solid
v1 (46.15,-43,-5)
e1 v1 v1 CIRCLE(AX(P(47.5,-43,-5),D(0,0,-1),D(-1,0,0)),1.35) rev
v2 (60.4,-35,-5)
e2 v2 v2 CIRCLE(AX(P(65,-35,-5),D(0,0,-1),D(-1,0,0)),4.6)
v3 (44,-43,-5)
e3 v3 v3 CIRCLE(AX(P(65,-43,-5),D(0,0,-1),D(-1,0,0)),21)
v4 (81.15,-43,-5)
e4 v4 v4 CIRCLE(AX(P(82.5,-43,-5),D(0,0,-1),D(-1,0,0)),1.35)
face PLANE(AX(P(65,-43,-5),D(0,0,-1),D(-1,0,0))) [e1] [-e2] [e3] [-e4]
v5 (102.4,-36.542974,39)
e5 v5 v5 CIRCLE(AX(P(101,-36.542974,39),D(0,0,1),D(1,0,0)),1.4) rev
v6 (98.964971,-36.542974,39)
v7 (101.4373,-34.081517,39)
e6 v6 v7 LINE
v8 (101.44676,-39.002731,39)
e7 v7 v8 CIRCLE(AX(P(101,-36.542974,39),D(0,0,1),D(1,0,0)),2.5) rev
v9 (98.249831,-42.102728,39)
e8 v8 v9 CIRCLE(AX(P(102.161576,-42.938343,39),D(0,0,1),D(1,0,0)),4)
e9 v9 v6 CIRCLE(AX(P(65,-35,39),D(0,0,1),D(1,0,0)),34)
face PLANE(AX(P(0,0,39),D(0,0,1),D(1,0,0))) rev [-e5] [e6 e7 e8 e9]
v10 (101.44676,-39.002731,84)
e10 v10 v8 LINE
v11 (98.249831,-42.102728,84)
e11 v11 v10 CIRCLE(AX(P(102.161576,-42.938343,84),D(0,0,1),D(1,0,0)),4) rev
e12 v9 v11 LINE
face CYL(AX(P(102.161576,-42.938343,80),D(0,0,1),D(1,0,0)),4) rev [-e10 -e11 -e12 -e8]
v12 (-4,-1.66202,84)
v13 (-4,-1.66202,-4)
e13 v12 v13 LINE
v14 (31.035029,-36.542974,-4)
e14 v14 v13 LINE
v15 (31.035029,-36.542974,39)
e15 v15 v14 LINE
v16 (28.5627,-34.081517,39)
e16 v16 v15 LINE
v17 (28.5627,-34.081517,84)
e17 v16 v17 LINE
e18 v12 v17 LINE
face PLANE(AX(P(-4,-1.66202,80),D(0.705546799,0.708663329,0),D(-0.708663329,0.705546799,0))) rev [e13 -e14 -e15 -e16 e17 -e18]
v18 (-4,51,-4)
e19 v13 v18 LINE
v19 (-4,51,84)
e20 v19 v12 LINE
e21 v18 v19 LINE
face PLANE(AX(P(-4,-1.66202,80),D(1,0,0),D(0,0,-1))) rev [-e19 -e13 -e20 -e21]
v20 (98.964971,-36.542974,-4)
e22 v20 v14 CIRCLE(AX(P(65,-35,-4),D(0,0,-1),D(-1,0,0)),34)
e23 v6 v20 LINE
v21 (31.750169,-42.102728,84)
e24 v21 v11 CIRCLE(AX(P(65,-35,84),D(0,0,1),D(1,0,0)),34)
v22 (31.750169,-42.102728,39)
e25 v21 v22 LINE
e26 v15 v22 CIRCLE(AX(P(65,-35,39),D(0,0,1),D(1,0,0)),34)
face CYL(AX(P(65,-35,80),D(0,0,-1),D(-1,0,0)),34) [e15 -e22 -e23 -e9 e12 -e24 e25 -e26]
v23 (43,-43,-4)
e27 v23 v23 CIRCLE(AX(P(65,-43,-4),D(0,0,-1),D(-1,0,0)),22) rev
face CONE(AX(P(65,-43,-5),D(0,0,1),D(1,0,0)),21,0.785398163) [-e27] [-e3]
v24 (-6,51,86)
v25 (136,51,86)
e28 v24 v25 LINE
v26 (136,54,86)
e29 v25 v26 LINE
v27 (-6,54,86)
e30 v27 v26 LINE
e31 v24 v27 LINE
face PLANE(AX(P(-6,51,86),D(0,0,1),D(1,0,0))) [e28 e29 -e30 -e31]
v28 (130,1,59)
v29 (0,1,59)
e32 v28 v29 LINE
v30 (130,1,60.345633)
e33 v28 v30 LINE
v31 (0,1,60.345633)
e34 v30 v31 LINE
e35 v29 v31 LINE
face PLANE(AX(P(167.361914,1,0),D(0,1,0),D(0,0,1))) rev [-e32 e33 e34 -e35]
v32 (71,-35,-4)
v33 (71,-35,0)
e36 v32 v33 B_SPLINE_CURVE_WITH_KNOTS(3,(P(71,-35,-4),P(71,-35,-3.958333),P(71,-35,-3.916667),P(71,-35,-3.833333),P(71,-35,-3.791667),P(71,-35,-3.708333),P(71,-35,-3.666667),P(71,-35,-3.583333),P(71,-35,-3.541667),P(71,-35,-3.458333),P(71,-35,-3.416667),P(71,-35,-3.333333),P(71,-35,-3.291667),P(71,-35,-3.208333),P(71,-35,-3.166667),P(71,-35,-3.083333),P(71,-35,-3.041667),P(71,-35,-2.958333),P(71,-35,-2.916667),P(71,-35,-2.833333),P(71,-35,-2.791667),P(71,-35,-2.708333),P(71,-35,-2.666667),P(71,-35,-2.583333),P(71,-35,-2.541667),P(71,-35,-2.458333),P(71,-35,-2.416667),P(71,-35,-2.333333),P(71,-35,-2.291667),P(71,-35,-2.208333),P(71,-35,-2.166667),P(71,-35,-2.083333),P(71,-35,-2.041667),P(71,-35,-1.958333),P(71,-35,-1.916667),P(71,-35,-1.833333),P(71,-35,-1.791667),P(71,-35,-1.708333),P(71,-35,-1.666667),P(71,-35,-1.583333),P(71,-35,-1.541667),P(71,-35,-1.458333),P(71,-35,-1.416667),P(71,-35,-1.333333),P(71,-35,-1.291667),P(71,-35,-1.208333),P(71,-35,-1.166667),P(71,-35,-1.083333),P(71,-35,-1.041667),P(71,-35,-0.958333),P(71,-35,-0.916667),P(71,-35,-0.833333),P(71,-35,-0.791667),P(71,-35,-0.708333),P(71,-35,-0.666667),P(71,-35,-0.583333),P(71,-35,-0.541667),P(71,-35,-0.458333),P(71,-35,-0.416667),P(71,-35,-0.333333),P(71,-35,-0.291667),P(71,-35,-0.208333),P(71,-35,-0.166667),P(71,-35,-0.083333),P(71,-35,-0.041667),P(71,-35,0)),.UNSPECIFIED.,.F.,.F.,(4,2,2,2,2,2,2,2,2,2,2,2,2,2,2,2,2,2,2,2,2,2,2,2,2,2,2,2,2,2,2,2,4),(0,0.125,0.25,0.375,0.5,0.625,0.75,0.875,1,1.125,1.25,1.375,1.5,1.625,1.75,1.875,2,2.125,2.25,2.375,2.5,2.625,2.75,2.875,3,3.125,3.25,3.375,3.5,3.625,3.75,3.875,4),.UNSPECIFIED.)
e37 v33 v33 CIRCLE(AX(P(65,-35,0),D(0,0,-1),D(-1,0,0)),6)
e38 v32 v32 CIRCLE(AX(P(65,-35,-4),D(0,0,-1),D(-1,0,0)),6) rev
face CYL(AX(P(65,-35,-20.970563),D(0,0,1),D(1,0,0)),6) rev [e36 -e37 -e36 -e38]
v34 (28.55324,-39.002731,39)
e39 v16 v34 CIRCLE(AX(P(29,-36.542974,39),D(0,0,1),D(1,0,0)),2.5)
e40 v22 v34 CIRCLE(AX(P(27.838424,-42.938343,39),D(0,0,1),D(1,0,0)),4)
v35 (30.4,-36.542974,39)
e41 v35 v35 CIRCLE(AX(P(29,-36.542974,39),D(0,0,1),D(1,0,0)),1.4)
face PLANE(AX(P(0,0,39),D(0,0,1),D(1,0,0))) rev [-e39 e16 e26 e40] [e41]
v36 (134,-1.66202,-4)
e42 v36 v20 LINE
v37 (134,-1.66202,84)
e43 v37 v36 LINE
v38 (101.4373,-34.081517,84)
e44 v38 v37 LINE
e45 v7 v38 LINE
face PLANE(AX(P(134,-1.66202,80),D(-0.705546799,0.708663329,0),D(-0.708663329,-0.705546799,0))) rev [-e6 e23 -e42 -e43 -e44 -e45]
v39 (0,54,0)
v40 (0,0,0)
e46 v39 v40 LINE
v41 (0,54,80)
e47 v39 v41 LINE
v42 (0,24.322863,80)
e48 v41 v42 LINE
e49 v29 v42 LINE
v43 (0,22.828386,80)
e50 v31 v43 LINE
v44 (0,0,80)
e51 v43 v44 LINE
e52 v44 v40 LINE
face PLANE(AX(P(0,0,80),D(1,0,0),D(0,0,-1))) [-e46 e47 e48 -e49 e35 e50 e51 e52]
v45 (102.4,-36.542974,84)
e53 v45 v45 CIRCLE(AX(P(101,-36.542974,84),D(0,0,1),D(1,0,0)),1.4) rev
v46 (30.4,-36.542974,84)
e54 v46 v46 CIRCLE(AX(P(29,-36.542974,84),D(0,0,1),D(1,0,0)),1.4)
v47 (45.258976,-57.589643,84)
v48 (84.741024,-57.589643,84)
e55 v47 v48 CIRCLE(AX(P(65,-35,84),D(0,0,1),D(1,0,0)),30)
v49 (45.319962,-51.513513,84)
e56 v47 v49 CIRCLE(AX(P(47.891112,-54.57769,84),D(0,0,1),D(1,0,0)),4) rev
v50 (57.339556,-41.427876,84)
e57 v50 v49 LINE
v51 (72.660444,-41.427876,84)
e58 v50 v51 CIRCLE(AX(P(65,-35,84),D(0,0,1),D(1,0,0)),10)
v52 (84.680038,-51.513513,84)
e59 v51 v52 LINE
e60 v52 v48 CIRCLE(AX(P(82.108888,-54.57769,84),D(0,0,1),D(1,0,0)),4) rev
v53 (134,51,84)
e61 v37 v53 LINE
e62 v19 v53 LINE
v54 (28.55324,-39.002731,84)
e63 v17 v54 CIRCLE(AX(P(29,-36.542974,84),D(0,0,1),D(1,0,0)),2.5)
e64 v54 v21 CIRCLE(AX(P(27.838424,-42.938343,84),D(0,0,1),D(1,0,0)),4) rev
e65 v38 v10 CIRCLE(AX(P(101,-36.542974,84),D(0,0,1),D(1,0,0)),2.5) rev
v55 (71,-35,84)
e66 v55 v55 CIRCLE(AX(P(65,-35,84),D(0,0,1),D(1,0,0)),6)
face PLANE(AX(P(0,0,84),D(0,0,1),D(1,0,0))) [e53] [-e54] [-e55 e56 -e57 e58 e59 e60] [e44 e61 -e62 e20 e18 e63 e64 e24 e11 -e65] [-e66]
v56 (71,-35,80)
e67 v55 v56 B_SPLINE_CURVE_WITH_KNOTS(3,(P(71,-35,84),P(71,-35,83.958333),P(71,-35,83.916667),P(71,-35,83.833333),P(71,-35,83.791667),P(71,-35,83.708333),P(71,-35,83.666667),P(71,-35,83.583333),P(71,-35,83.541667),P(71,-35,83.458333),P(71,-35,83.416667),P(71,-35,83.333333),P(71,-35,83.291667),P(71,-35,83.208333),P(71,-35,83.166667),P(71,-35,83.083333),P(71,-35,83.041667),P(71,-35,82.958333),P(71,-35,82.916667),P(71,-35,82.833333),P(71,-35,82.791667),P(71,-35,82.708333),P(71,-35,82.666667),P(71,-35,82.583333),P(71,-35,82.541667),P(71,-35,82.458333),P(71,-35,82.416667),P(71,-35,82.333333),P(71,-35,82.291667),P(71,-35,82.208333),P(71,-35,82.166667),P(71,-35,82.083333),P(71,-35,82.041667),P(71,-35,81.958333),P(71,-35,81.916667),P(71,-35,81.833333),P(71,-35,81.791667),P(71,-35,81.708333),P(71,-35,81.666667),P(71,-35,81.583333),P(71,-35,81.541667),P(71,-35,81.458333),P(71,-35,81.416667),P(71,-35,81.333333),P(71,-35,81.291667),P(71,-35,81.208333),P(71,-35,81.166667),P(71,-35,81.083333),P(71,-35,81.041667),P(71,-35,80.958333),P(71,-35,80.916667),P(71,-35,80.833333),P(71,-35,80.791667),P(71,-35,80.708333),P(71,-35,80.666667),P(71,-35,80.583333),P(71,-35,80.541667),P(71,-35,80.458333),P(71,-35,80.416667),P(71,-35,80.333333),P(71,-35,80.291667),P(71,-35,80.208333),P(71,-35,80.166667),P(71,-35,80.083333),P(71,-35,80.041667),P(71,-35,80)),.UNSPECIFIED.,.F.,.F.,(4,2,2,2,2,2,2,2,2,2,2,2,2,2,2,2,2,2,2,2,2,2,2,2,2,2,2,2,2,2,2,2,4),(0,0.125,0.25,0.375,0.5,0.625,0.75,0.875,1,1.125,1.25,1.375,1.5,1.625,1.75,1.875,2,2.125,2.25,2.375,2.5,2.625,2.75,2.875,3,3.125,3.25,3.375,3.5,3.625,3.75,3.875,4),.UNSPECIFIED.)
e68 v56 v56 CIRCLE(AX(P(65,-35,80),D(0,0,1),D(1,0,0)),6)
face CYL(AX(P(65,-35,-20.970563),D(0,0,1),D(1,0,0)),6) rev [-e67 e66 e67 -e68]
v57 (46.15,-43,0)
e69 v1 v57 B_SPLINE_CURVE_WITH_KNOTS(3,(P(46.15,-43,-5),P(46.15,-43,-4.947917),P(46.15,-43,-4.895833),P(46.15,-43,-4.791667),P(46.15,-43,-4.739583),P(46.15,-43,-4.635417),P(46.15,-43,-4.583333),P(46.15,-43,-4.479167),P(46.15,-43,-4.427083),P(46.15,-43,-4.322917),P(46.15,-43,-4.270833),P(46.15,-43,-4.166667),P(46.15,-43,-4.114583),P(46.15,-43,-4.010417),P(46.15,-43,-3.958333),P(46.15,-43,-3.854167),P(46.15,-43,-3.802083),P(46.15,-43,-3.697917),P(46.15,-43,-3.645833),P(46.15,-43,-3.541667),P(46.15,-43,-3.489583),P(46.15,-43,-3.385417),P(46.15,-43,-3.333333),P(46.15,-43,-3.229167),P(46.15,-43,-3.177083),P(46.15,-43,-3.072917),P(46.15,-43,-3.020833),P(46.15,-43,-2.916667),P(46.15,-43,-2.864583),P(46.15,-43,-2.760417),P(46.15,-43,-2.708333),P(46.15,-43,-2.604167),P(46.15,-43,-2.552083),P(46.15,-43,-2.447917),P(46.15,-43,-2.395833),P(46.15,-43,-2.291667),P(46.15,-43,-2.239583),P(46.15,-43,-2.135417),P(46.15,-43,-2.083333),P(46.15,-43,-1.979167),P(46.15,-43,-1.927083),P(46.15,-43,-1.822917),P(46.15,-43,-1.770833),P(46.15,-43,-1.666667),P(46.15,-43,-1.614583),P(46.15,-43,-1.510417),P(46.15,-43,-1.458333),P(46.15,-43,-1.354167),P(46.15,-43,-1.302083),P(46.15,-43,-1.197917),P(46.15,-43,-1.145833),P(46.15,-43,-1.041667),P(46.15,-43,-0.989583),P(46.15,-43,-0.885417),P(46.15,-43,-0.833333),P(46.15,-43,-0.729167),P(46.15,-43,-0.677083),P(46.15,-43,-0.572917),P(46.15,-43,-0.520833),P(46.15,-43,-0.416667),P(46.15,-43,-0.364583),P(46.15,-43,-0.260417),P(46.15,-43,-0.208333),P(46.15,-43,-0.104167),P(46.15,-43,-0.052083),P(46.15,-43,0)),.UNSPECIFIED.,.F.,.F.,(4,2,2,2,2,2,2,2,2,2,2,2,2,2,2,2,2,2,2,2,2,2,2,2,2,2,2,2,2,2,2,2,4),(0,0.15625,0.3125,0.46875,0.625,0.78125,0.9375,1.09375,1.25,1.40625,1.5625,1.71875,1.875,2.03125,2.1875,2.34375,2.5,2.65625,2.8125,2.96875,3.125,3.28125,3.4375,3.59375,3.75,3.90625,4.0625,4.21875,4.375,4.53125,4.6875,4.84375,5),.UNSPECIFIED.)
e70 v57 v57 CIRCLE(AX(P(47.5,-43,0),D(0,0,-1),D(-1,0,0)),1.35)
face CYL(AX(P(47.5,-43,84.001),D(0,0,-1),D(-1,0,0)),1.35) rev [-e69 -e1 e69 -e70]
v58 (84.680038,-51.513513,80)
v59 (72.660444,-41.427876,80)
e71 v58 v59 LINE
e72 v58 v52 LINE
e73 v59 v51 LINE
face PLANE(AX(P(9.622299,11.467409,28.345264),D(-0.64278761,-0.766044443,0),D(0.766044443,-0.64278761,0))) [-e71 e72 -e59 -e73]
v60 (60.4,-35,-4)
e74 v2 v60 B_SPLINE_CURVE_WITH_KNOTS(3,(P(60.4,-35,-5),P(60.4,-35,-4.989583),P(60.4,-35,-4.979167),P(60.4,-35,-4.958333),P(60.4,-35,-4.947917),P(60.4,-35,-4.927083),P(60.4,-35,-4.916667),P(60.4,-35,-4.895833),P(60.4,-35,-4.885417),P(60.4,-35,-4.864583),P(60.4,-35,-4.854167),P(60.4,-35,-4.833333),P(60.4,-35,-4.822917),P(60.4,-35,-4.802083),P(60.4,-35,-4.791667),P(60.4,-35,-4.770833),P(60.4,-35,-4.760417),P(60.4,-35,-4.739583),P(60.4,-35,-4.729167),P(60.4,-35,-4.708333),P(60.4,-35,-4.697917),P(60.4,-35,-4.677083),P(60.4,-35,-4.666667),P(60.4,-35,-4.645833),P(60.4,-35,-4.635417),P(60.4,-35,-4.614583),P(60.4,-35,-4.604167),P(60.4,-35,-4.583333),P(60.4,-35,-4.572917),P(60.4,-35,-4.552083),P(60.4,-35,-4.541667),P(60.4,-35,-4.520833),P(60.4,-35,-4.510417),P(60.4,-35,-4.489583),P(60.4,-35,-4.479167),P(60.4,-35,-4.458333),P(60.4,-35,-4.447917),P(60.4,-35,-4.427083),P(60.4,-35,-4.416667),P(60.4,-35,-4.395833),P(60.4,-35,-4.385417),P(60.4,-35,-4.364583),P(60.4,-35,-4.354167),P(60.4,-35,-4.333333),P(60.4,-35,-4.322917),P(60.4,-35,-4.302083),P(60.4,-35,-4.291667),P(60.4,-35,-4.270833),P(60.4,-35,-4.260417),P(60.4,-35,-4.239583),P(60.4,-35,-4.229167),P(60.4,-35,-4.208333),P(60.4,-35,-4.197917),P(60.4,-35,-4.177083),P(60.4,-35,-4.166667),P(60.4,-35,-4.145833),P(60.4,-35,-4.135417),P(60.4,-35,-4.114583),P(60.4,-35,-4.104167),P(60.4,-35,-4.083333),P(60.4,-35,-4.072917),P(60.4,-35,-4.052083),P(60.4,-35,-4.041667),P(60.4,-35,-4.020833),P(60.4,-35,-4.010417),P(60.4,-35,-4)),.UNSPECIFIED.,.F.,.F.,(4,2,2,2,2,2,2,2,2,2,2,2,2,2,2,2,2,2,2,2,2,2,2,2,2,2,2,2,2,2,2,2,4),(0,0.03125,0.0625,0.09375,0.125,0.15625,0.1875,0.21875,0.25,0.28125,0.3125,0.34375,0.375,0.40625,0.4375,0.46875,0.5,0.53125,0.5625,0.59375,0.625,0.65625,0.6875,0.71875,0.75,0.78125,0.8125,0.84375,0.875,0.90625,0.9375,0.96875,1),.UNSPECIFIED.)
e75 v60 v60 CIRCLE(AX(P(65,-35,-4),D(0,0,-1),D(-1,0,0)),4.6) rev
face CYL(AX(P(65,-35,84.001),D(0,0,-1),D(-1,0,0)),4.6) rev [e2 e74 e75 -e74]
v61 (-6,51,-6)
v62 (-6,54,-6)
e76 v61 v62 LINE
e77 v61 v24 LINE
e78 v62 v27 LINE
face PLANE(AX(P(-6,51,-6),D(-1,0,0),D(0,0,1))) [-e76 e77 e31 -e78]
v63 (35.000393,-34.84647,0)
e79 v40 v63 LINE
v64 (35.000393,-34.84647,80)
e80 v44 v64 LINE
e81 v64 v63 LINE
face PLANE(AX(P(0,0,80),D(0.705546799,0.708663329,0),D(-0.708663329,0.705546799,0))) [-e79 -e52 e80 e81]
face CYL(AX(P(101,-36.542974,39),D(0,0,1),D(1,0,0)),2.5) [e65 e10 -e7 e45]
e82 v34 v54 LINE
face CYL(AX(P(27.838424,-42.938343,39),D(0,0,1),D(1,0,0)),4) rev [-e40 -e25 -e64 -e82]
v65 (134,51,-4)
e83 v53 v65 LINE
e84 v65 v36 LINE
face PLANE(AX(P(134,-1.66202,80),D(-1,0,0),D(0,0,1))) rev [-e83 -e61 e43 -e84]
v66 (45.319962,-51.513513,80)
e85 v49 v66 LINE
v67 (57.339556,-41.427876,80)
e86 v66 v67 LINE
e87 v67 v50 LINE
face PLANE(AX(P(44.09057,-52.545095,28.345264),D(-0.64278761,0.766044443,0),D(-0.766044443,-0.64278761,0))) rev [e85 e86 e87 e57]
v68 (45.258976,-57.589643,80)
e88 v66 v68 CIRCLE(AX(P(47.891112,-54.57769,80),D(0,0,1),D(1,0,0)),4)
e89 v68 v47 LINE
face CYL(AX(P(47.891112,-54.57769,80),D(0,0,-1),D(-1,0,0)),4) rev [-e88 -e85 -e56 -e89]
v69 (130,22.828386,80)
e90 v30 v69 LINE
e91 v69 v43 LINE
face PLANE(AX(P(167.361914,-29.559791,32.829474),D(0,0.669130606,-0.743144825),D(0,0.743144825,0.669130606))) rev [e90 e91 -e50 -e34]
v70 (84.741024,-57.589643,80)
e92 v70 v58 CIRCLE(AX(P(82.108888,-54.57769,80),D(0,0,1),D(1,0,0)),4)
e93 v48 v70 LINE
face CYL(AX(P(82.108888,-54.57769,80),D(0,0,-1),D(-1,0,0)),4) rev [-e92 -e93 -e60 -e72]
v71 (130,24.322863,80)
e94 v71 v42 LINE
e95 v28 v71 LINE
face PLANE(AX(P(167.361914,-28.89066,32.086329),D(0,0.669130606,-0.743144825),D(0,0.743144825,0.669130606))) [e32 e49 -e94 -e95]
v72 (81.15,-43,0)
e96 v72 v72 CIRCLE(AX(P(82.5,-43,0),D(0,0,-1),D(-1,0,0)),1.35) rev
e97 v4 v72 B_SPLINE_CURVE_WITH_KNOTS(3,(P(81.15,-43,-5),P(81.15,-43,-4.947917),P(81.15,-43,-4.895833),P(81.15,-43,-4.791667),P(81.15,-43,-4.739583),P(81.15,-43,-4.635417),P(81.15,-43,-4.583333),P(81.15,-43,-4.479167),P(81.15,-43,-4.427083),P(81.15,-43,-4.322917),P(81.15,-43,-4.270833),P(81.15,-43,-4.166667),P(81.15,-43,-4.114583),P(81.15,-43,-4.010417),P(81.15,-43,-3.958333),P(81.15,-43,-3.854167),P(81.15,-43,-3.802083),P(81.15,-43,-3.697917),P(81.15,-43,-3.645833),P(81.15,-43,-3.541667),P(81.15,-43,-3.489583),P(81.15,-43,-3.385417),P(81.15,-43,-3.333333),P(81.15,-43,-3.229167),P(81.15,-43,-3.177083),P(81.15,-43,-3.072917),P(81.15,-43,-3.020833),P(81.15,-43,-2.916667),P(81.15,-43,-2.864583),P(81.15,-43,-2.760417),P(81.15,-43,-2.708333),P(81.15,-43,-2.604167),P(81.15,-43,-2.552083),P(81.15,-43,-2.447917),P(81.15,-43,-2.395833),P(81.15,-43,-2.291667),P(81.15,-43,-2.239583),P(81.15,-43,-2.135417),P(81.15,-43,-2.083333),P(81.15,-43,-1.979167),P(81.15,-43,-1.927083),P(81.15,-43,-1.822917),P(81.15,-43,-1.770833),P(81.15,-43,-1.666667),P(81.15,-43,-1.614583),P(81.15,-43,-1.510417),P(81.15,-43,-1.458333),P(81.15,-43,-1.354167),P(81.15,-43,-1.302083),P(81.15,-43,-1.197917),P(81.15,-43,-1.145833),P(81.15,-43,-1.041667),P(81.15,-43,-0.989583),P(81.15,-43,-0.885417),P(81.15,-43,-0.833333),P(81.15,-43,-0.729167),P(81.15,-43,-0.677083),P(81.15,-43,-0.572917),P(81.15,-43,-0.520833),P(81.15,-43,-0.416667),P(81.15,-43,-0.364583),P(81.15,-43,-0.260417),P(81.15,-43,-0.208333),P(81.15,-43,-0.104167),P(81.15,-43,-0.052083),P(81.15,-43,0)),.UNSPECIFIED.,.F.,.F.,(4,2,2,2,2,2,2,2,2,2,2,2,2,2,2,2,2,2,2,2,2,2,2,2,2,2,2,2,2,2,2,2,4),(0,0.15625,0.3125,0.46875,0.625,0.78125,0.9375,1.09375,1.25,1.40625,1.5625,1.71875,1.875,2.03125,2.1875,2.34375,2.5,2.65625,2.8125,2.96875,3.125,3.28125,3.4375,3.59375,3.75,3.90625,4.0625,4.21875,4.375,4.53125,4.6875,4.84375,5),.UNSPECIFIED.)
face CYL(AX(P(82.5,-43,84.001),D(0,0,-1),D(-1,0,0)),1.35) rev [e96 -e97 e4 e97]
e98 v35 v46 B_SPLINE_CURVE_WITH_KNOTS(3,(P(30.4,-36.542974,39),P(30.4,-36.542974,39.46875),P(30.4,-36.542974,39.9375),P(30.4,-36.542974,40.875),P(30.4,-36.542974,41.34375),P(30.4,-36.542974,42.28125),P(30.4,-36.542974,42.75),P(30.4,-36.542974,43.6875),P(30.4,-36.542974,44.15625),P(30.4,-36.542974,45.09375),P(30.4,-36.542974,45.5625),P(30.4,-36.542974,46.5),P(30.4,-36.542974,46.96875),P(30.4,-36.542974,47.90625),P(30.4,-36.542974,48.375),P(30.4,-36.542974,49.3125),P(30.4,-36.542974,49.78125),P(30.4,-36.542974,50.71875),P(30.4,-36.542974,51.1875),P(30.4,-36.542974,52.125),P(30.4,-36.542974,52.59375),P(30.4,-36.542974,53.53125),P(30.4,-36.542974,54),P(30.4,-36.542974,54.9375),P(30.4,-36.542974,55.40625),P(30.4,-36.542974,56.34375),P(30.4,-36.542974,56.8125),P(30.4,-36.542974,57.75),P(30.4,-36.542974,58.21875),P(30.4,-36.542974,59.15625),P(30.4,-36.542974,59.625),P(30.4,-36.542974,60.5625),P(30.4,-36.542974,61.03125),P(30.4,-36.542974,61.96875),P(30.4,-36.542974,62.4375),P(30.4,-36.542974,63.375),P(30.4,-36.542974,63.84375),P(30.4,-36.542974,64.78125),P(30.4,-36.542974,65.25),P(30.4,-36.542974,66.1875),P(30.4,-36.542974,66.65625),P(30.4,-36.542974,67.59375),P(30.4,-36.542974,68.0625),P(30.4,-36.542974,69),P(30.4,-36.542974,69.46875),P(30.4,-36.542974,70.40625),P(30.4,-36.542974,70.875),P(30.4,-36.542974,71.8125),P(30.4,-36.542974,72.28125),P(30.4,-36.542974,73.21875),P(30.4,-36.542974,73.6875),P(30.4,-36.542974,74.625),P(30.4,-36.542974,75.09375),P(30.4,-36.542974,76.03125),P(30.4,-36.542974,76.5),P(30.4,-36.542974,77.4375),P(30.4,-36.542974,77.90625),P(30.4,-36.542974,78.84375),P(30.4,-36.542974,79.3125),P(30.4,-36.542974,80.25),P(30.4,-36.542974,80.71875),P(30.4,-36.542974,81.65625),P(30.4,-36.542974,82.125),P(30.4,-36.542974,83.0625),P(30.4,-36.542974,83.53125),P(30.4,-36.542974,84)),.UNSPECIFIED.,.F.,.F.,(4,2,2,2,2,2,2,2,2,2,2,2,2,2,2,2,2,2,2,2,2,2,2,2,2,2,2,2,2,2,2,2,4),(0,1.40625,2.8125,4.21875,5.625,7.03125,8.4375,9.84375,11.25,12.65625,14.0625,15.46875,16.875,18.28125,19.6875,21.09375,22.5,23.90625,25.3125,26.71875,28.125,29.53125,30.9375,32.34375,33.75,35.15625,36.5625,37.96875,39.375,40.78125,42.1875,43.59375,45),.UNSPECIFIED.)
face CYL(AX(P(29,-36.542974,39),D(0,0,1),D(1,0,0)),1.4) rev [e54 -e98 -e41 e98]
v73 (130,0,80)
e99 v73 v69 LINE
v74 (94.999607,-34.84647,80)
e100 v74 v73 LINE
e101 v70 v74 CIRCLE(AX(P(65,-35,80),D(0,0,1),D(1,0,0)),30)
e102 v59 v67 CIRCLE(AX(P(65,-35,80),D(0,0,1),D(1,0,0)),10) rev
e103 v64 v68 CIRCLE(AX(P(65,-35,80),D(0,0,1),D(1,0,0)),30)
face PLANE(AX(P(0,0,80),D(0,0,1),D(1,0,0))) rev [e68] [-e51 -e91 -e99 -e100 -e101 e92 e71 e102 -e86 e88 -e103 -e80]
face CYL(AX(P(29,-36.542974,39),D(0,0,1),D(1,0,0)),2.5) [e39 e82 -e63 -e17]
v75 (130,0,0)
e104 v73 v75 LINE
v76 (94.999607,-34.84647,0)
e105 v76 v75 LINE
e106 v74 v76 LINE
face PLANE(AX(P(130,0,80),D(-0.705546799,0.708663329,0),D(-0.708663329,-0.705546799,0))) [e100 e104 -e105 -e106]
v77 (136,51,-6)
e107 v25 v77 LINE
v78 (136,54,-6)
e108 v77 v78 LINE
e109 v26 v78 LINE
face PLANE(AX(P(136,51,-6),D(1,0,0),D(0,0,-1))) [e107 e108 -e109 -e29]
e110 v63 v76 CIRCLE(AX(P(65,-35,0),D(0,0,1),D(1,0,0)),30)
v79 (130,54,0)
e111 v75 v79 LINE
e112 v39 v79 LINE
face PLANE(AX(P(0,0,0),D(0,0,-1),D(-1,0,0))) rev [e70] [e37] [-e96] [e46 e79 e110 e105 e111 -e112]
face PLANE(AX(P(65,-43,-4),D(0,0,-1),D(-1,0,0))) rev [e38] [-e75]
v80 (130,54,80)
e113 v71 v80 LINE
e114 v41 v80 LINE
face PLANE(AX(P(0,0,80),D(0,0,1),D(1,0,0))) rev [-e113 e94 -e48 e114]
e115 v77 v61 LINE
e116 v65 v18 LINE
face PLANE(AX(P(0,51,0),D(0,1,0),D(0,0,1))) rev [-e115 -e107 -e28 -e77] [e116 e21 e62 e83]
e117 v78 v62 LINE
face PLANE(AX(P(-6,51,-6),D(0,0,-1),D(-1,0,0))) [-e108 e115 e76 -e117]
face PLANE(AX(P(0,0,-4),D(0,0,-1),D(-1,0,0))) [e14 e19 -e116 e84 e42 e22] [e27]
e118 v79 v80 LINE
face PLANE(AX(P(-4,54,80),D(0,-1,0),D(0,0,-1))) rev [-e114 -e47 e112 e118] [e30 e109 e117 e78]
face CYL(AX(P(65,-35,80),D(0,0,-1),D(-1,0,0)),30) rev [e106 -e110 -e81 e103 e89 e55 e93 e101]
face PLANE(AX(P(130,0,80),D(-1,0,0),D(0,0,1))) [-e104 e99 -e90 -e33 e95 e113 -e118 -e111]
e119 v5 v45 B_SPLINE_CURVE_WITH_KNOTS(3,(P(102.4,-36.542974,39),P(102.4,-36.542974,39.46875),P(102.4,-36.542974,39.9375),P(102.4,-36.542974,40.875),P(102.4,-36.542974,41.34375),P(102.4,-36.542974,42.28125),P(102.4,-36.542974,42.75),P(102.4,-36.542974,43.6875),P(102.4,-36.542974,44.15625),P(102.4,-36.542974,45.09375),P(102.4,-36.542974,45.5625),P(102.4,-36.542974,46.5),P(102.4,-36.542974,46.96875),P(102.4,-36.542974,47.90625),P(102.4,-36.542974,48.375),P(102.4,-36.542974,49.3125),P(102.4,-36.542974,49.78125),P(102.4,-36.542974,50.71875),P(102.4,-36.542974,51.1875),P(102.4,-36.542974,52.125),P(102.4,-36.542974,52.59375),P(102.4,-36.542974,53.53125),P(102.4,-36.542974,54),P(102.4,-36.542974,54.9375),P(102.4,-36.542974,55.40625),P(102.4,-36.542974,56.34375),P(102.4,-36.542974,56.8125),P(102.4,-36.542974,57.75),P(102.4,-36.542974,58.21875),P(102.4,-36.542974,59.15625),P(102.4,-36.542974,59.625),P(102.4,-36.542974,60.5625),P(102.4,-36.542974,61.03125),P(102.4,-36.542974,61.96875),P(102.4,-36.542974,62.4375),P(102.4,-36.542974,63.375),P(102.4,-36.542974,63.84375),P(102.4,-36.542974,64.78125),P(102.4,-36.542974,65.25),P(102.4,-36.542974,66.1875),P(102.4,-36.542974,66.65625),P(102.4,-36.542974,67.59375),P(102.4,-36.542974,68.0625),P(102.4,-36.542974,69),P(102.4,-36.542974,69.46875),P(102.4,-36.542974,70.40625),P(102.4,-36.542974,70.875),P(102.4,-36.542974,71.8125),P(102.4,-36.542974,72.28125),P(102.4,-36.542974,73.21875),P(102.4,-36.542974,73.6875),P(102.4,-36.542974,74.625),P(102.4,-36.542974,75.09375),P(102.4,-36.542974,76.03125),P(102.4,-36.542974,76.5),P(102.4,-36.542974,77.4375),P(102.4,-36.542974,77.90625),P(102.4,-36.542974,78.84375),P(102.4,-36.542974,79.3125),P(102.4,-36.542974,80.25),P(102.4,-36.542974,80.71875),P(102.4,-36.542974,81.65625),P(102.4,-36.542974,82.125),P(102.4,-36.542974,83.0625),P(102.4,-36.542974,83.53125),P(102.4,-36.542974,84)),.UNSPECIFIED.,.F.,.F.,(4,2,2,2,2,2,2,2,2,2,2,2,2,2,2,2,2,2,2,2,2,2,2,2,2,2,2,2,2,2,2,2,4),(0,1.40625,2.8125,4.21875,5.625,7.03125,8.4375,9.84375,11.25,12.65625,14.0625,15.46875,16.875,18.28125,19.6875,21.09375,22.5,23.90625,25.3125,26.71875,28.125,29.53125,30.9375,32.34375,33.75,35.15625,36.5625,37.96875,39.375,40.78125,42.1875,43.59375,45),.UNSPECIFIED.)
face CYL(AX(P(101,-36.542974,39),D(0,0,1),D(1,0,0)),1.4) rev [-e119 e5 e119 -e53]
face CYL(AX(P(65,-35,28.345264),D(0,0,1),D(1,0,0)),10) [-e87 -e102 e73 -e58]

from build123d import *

# Parameters (mm, degrees)
EXTRUDE_1_DEPTH             = 80
EXTRUDE_2_DEPTH             = 4
EXTRUDE_START               = 4
EXTRUDE_3_DEPTH             = 4
CUT_EXTRUDE_1_DEPTH         = 4
CUT_EXTRUDE_2_REACH         = 176.531
SKETCH_5_R                  = 6.0000000000000036
CUT_EXTRUDE_START           = -4
CUT_EXTRUDE_3_DEPTH         = 4
SKETCH_7_R                  = 21
EXTRUDE_4_DEPTH             = 1
CUT_EXTRUDE_5_REACH         = 177.037
SKETCH_9_R                  = 4.599999999999999
SKETCH_9_R_2                = 1.3500000000000065
EXTRUDE_5_REACH             = 130.756
EXTRUDE_5_DIRECTION_2_REACH = 130.756
SKETCH_12_W                 = 138
SKETCH_12_H                 = 88
EXTRUDE_6_DEPTH             = 3
CHAMFER_1_SIZE              = 1
SKETCH_13_R                 = 2.5000000000000027
SKETCH_13_R_2               = 1.3999999999999955
SKETCH_13_R_3               = 2.5000000000000244
SKETCH_13_R_4               = 1.4000000000000308
EXTRUDE_7_DEPTH             = 45
FILLET_1_R                  = 4
FILLET_2_R                  = 4


with BuildPart() as part:
    # 草圖1 → 填料-伸長1 (new body)
    with BuildSketch(Plane.XY):
        with BuildLine():
            Line((-4, -1.6620202496294076), (-4, 54.00000000000001))
            Line((-4, 54.00000000000001), (134, 54.00000000000001))
            Line((134, 54.00000000000001), (134, -1.662020249629414))
            Line((134, -1.662020249629414), (98.96497064934022, -36.54297400803102))
            ThreePointArc((98.96497064934022, -36.54297400803102), (65.00000000000001, -69), (31.035029350659826, -36.54297400803101))
            Line((31.035029350659826, -36.54297400803101), (-4, -1.6620202496294076))
        make_face()
        with BuildLine():
            Line((0, 0), (0, 50))
            Line((0, 50), (130, 50))
            Line((130, 50), (130, 0))
            Line((130, 0), (94.99960713766303, -34.8464695929839))
            ThreePointArc((94.99960713766303, -34.8464695929839), (65.00000000000001, -65), (35.000392862337, -34.84646959298392))
            Line((35.000392862337, -34.84646959298392), (0, 0))
        make_face(mode=Mode.SUBTRACT)
    extrude(amount=EXTRUDE_1_DEPTH)

    # 草圖2 → 填料-伸長2 (add)
    # profile 1 of 2: a face of its own
    with BuildSketch(Plane.XY.offset(80)):
        with BuildLine():
            Line((-4, 54.00000000000001), (-4, -1.6620202496294076))
            Line((-4, -1.6620202496294076), (31.03502935065982, -36.54297400803101))
            ThreePointArc((31.03502935065982, -36.54297400803101), (65.00000000000001, -69), (98.96497064934022, -36.54297400803102))
            Line((98.96497064934022, -36.54297400803102), (134, -1.662020249629414))
            Line((134, -1.662020249629414), (134, 54.00000000000001))
            Line((134, 54.00000000000001), (-4, 54.00000000000001))
        make_face()
        with BuildLine():
            Line((130, 0), (94.99960713766303, -34.8464695929839))
            ThreePointArc((94.99960713766303, -34.8464695929839), (65.00000000000003, -65), (35.000392862337, -34.84646959298392))
            Line((35.000392862337, -34.84646959298392), (0, 0))
            Line((0, 0), (0, 50))
            Line((0, 50), (130, 50))
            Line((130, 50), (130, 0))
        make_face(mode=Mode.SUBTRACT)
    # profile 2 of 2: a face of its own
    with BuildSketch(Plane.XY.offset(80)):
        with BuildLine():
            ThreePointArc((94.99960713766303, -34.8464695929839), (65.00000000000003, -65), (35.000392862337, -34.84646959298392))
            Line((35.000392862337, -34.84646959298392), (0, 0))
            Line((0, 0), (0, 50))
            Line((0, 50), (130, 50))
            Line((130, 50), (130, 0))
            Line((130, 0), (94.99960713766303, -34.8464695929839))
        make_face()
    extrude(amount=EXTRUDE_2_DEPTH)

    # 草圖3 → 填料-伸長3 (add)
    with BuildSketch(Plane(origin=(0, 0, 0), x_dir=(-1, 0, 0), z_dir=(0, 0, -1)).offset(EXTRUDE_START)):
        with BuildLine():
            Line((-134, 54.00000000000001), (-134, -1.662020249629414))
            Line((-134, -1.662020249629414), (-98.9649706493402, -36.54297400803101))
            ThreePointArc((-98.9649706493402, -36.54297400803101), (-65.00000000000001, -69), (-31.03502935065982, -36.54297400803101))
            Line((-31.03502935065982, -36.54297400803101), (4, -1.6620202496294076))
            Line((4, -1.6620202496294076), (4, 54.00000000000001))
            Line((4, 54.00000000000001), (-134, 54.00000000000001))
        make_face()
    extrude(amount=-EXTRUDE_3_DEPTH)

    # 草圖4 → 除料-伸長1 (cut)
    with BuildSketch(Plane(origin=(0, 54.00000000000001, 0), x_dir=(1, 0, 0), z_dir=(0, 1, 0))):
        Polygon((0, 1.73e-15), (130, 0), (130, -80), (1.029e-14, -80), align=None)
    extrude(amount=-CUT_EXTRUDE_1_DEPTH, mode=Mode.SUBTRACT)

    # 除料-伸長2: up to this face of the body (flat: up to its plane)
    cut_extrude_2_end = Plane(part.part.faces().sort_by_distance((65, 4.120950098, -4))[0])
    # 草圖5 → 除料-伸長2 (cut, up to the picked face)
    with BuildSketch(Plane.XY.offset(84), mode=Mode.PRIVATE) as cut_extrude_2_sk1:
        with Locations((65.00000000000001, -35)):
            Circle(SKETCH_5_R)
    cut_extrude_2_tool1 = split(extrude(cut_extrude_2_sk1.sketch, amount=-CUT_EXTRUDE_2_REACH, mode=Mode.PRIVATE), bisect_by=cut_extrude_2_end, keep=Keep.BOTH, mode=Mode.PRIVATE)
    add(cut_extrude_2_tool1.solids().sort_by(Axis((65, -35, 84), (0, 0, -1)))[0], mode=Mode.SUBTRACT)

    # 草圖6 → 除料-伸長3 (cut)
    with BuildSketch(Plane.XY.offset(84).offset(CUT_EXTRUDE_START)):
        with BuildLine():
            ThreePointArc((64.99999999999967, -45), (60.77381738259285, -44.06307787036642), (57.33955556881022, -41.427876096865376))
            Line((57.339555568810226, -41.42787609686538), (42.01866670643064, -54.28362829059615))
            ThreePointArc((42.01866670643065, -54.28362829059614), (52.32145214777887, -62.18923361109942), (64.99999999999969, -65))
            Line((65.00000000000004, -65), (65.00000000000003, -45.00000000000001))
        make_face()
        with BuildLine():
            Line((87.9813332935694, -54.28362829059614), (72.66044443118982, -41.427876096865376))
            ThreePointArc((72.66044443118982, -41.427876096865376), (69.22618261740686, -44.06307787036657), (64.99999999999967, -45))
            Line((65.00000000000003, -45.00000000000001), (65.00000000000004, -65))
            ThreePointArc((64.99999999999969, -65), (77.67854785222087, -62.18923361109955), (87.9813332935694, -54.28362829059614))
        make_face()
    extrude(amount=CUT_EXTRUDE_3_DEPTH, mode=Mode.SUBTRACT)

    # 草圖7 → 填料-伸長4 (add)
    with BuildSketch(Plane(origin=(0, 0, -4), x_dir=(-1, 0, 0), z_dir=(0, 0, -1))):
        with Locations((-65.00000000000001, -43)):
            Circle(SKETCH_7_R)
    extrude(amount=EXTRUDE_4_DEPTH)

    # 草圖9 → 除料-伸長5 (cut, up to next)
    with BuildSketch(Plane(origin=(0, 0, -5), x_dir=(-1, 0, 0), z_dir=(0, 0, -1)), mode=Mode.PRIVATE) as cut_extrude_5_sk1:
        with Locations((-65.00000000000001, -35)):
            Circle(SKETCH_9_R)
    cut_extrude_5_tool1 = extrude(cut_extrude_5_sk1.sketch, amount=-CUT_EXTRUDE_5_REACH, mode=Mode.PRIVATE) & part.part
    # 草圖9 → 除料-伸長5 (cut, up to next)
    with BuildSketch(Plane(origin=(0, 0, -5), x_dir=(-1, 0, 0), z_dir=(0, 0, -1)), mode=Mode.PRIVATE) as cut_extrude_5_sk2:
        with Locations((-82.50000000000001, -43)):
            Circle(SKETCH_9_R_2)
    cut_extrude_5_tool2 = extrude(cut_extrude_5_sk2.sketch, amount=-CUT_EXTRUDE_5_REACH, mode=Mode.PRIVATE) & part.part
    # 草圖9 → 除料-伸長5 (cut, up to next)
    with BuildSketch(Plane(origin=(0, 0, -5), x_dir=(-1, 0, 0), z_dir=(0, 0, -1)), mode=Mode.PRIVATE) as cut_extrude_5_sk3:
        with Locations((-47.50000000000001, -43)):
            Circle(SKETCH_9_R_2)
    cut_extrude_5_tool3 = extrude(cut_extrude_5_sk3.sketch, amount=-CUT_EXTRUDE_5_REACH, mode=Mode.PRIVATE) & part.part
    add(cut_extrude_5_tool1.solids().sort_by_distance((65, -35, -5))[0], mode=Mode.SUBTRACT)
    add(cut_extrude_5_tool2.solids().sort_by_distance((82.5, -43, -5))[0], mode=Mode.SUBTRACT)
    add(cut_extrude_5_tool3.solids().sort_by_distance((47.5, -43, -5))[0], mode=Mode.SUBTRACT)

    # 填料-伸長5: up to this face of the body (flat: up to its plane)
    extrude_5_end = Plane(part.part.faces().sort_by_distance((130, 27, 40))[0])
    # 草圖10 → 填料-伸長5 (add, up to the picked face)
    with BuildSketch(Plane(origin=(65, 0, 0), x_dir=(0, 0, -1), z_dir=(1, 0, 0)), mode=Mode.PRIVATE) as extrude_5_sk1:
        Polygon((-83, 26.160223806036317), (-60.34563272960637, 1.0000000000000073), (-59.00000000000001, 1.0000000000000078), (-84, 28.765312870730142), (-84, 1.0000000000000044), (-83, 1.0000000000000044), align=None)
    extrude_5_tool1 = split(extrude(extrude_5_sk1.sketch, amount=EXTRUDE_5_REACH, mode=Mode.PRIVATE), bisect_by=extrude_5_end, keep=Keep.BOTH, mode=Mode.PRIVATE)
    add(extrude_5_tool1.solids().sort_by(Axis((65, 13.830112, 71.395163), (1, 0, 0)))[0])

    # 填料-伸長5 direction 2: up to this face of the body (flat: up to its plane)
    extrude_5_direction_2_end = Plane(part.part.faces().sort_by_distance((0, 27, 40))[0])
    # 草圖10 → 填料-伸長5 direction 2 (add, up to the picked face)
    with BuildSketch(Plane(origin=(65, 0, 0), x_dir=(0, 0, -1), z_dir=(1, 0, 0)), mode=Mode.PRIVATE) as extrude_5_direction_2_sk1:
        Polygon((-83, 26.160223806036317), (-60.34563272960637, 1.0000000000000073), (-59.00000000000001, 1.0000000000000078), (-84, 28.765312870730142), (-84, 1.0000000000000044), (-83, 1.0000000000000044), align=None)
    extrude_5_direction_2_tool1 = split(extrude(extrude_5_direction_2_sk1.sketch, amount=-EXTRUDE_5_DIRECTION_2_REACH, mode=Mode.PRIVATE), bisect_by=extrude_5_direction_2_end, keep=Keep.BOTH, mode=Mode.PRIVATE)
    add(extrude_5_direction_2_tool1.solids().sort_by(Axis((65, 13.830112, 71.395163), (-1, 0, 0)))[0])

    # 草圖12 → 填料-伸長6 (add)
    with BuildSketch(Plane(origin=(0, 54.00000000000001, 0), x_dir=(1, 0, 0), z_dir=(0, 1, 0))):
        Polygon((-6, 6), (136, 6), (136, -86), (-5.9999999999999885, -86), align=None)
        with Locations((65, -40)):
            Rectangle(SKETCH_12_W, SKETCH_12_H, mode=Mode.SUBTRACT)
    extrude(amount=-EXTRUDE_6_DEPTH)

    # 導角1
    chamfer_1_edges = [part.edges().sort_by_distance(p)[0] for p in [
        (86.00000000000001, -43, -4),
    ]]
    chamfer(chamfer_1_edges, length=CHAMFER_1_SIZE - 0.0001)  # a hair under: the kernel refuses the full size

    # 草圖13 → 填料-伸長7 (add)
    # profile 1 of 2: a face of its own
    with BuildSketch(Plane.XY.offset(84)):
        with Locations((29.000000000000018, -36.54297400803102)):
            Circle(SKETCH_13_R)
        with Locations((29.000000000000018, -36.54297400803102)):
            Circle(SKETCH_13_R_2, mode=Mode.SUBTRACT)
    # profile 2 of 2: a face of its own
    with BuildSketch(Plane.XY.offset(84)):
        with Locations((101, -36.54297400803102)):
            Circle(SKETCH_13_R_3)
        with Locations((101, -36.54297400803102)):
            Circle(SKETCH_13_R_4, mode=Mode.SUBTRACT)
    extrude(amount=-EXTRUDE_7_DEPTH)

    # 圓角1
    fillet_1_edges = [part.edges().sort_by_distance(p)[0] for p in [
        (42.01866670643065, -54.28362829059614, 82),
        (87.9813332935694, -54.28362829059614, 82),
    ]]
    fillet(fillet_1_edges, radius=FILLET_1_R)

    # 圓角2
    fillet_2_edges = [part.edges().sort_by_distance(p)[0] for p in [
        (31.121034817860412, -37.86630741327102, 61.5),
        (98.87896518213962, -37.86630741327102, 61.5),
    ]]
    fillet(fillet_2_edges, radius=FILLET_2_R)


solid = part.part
